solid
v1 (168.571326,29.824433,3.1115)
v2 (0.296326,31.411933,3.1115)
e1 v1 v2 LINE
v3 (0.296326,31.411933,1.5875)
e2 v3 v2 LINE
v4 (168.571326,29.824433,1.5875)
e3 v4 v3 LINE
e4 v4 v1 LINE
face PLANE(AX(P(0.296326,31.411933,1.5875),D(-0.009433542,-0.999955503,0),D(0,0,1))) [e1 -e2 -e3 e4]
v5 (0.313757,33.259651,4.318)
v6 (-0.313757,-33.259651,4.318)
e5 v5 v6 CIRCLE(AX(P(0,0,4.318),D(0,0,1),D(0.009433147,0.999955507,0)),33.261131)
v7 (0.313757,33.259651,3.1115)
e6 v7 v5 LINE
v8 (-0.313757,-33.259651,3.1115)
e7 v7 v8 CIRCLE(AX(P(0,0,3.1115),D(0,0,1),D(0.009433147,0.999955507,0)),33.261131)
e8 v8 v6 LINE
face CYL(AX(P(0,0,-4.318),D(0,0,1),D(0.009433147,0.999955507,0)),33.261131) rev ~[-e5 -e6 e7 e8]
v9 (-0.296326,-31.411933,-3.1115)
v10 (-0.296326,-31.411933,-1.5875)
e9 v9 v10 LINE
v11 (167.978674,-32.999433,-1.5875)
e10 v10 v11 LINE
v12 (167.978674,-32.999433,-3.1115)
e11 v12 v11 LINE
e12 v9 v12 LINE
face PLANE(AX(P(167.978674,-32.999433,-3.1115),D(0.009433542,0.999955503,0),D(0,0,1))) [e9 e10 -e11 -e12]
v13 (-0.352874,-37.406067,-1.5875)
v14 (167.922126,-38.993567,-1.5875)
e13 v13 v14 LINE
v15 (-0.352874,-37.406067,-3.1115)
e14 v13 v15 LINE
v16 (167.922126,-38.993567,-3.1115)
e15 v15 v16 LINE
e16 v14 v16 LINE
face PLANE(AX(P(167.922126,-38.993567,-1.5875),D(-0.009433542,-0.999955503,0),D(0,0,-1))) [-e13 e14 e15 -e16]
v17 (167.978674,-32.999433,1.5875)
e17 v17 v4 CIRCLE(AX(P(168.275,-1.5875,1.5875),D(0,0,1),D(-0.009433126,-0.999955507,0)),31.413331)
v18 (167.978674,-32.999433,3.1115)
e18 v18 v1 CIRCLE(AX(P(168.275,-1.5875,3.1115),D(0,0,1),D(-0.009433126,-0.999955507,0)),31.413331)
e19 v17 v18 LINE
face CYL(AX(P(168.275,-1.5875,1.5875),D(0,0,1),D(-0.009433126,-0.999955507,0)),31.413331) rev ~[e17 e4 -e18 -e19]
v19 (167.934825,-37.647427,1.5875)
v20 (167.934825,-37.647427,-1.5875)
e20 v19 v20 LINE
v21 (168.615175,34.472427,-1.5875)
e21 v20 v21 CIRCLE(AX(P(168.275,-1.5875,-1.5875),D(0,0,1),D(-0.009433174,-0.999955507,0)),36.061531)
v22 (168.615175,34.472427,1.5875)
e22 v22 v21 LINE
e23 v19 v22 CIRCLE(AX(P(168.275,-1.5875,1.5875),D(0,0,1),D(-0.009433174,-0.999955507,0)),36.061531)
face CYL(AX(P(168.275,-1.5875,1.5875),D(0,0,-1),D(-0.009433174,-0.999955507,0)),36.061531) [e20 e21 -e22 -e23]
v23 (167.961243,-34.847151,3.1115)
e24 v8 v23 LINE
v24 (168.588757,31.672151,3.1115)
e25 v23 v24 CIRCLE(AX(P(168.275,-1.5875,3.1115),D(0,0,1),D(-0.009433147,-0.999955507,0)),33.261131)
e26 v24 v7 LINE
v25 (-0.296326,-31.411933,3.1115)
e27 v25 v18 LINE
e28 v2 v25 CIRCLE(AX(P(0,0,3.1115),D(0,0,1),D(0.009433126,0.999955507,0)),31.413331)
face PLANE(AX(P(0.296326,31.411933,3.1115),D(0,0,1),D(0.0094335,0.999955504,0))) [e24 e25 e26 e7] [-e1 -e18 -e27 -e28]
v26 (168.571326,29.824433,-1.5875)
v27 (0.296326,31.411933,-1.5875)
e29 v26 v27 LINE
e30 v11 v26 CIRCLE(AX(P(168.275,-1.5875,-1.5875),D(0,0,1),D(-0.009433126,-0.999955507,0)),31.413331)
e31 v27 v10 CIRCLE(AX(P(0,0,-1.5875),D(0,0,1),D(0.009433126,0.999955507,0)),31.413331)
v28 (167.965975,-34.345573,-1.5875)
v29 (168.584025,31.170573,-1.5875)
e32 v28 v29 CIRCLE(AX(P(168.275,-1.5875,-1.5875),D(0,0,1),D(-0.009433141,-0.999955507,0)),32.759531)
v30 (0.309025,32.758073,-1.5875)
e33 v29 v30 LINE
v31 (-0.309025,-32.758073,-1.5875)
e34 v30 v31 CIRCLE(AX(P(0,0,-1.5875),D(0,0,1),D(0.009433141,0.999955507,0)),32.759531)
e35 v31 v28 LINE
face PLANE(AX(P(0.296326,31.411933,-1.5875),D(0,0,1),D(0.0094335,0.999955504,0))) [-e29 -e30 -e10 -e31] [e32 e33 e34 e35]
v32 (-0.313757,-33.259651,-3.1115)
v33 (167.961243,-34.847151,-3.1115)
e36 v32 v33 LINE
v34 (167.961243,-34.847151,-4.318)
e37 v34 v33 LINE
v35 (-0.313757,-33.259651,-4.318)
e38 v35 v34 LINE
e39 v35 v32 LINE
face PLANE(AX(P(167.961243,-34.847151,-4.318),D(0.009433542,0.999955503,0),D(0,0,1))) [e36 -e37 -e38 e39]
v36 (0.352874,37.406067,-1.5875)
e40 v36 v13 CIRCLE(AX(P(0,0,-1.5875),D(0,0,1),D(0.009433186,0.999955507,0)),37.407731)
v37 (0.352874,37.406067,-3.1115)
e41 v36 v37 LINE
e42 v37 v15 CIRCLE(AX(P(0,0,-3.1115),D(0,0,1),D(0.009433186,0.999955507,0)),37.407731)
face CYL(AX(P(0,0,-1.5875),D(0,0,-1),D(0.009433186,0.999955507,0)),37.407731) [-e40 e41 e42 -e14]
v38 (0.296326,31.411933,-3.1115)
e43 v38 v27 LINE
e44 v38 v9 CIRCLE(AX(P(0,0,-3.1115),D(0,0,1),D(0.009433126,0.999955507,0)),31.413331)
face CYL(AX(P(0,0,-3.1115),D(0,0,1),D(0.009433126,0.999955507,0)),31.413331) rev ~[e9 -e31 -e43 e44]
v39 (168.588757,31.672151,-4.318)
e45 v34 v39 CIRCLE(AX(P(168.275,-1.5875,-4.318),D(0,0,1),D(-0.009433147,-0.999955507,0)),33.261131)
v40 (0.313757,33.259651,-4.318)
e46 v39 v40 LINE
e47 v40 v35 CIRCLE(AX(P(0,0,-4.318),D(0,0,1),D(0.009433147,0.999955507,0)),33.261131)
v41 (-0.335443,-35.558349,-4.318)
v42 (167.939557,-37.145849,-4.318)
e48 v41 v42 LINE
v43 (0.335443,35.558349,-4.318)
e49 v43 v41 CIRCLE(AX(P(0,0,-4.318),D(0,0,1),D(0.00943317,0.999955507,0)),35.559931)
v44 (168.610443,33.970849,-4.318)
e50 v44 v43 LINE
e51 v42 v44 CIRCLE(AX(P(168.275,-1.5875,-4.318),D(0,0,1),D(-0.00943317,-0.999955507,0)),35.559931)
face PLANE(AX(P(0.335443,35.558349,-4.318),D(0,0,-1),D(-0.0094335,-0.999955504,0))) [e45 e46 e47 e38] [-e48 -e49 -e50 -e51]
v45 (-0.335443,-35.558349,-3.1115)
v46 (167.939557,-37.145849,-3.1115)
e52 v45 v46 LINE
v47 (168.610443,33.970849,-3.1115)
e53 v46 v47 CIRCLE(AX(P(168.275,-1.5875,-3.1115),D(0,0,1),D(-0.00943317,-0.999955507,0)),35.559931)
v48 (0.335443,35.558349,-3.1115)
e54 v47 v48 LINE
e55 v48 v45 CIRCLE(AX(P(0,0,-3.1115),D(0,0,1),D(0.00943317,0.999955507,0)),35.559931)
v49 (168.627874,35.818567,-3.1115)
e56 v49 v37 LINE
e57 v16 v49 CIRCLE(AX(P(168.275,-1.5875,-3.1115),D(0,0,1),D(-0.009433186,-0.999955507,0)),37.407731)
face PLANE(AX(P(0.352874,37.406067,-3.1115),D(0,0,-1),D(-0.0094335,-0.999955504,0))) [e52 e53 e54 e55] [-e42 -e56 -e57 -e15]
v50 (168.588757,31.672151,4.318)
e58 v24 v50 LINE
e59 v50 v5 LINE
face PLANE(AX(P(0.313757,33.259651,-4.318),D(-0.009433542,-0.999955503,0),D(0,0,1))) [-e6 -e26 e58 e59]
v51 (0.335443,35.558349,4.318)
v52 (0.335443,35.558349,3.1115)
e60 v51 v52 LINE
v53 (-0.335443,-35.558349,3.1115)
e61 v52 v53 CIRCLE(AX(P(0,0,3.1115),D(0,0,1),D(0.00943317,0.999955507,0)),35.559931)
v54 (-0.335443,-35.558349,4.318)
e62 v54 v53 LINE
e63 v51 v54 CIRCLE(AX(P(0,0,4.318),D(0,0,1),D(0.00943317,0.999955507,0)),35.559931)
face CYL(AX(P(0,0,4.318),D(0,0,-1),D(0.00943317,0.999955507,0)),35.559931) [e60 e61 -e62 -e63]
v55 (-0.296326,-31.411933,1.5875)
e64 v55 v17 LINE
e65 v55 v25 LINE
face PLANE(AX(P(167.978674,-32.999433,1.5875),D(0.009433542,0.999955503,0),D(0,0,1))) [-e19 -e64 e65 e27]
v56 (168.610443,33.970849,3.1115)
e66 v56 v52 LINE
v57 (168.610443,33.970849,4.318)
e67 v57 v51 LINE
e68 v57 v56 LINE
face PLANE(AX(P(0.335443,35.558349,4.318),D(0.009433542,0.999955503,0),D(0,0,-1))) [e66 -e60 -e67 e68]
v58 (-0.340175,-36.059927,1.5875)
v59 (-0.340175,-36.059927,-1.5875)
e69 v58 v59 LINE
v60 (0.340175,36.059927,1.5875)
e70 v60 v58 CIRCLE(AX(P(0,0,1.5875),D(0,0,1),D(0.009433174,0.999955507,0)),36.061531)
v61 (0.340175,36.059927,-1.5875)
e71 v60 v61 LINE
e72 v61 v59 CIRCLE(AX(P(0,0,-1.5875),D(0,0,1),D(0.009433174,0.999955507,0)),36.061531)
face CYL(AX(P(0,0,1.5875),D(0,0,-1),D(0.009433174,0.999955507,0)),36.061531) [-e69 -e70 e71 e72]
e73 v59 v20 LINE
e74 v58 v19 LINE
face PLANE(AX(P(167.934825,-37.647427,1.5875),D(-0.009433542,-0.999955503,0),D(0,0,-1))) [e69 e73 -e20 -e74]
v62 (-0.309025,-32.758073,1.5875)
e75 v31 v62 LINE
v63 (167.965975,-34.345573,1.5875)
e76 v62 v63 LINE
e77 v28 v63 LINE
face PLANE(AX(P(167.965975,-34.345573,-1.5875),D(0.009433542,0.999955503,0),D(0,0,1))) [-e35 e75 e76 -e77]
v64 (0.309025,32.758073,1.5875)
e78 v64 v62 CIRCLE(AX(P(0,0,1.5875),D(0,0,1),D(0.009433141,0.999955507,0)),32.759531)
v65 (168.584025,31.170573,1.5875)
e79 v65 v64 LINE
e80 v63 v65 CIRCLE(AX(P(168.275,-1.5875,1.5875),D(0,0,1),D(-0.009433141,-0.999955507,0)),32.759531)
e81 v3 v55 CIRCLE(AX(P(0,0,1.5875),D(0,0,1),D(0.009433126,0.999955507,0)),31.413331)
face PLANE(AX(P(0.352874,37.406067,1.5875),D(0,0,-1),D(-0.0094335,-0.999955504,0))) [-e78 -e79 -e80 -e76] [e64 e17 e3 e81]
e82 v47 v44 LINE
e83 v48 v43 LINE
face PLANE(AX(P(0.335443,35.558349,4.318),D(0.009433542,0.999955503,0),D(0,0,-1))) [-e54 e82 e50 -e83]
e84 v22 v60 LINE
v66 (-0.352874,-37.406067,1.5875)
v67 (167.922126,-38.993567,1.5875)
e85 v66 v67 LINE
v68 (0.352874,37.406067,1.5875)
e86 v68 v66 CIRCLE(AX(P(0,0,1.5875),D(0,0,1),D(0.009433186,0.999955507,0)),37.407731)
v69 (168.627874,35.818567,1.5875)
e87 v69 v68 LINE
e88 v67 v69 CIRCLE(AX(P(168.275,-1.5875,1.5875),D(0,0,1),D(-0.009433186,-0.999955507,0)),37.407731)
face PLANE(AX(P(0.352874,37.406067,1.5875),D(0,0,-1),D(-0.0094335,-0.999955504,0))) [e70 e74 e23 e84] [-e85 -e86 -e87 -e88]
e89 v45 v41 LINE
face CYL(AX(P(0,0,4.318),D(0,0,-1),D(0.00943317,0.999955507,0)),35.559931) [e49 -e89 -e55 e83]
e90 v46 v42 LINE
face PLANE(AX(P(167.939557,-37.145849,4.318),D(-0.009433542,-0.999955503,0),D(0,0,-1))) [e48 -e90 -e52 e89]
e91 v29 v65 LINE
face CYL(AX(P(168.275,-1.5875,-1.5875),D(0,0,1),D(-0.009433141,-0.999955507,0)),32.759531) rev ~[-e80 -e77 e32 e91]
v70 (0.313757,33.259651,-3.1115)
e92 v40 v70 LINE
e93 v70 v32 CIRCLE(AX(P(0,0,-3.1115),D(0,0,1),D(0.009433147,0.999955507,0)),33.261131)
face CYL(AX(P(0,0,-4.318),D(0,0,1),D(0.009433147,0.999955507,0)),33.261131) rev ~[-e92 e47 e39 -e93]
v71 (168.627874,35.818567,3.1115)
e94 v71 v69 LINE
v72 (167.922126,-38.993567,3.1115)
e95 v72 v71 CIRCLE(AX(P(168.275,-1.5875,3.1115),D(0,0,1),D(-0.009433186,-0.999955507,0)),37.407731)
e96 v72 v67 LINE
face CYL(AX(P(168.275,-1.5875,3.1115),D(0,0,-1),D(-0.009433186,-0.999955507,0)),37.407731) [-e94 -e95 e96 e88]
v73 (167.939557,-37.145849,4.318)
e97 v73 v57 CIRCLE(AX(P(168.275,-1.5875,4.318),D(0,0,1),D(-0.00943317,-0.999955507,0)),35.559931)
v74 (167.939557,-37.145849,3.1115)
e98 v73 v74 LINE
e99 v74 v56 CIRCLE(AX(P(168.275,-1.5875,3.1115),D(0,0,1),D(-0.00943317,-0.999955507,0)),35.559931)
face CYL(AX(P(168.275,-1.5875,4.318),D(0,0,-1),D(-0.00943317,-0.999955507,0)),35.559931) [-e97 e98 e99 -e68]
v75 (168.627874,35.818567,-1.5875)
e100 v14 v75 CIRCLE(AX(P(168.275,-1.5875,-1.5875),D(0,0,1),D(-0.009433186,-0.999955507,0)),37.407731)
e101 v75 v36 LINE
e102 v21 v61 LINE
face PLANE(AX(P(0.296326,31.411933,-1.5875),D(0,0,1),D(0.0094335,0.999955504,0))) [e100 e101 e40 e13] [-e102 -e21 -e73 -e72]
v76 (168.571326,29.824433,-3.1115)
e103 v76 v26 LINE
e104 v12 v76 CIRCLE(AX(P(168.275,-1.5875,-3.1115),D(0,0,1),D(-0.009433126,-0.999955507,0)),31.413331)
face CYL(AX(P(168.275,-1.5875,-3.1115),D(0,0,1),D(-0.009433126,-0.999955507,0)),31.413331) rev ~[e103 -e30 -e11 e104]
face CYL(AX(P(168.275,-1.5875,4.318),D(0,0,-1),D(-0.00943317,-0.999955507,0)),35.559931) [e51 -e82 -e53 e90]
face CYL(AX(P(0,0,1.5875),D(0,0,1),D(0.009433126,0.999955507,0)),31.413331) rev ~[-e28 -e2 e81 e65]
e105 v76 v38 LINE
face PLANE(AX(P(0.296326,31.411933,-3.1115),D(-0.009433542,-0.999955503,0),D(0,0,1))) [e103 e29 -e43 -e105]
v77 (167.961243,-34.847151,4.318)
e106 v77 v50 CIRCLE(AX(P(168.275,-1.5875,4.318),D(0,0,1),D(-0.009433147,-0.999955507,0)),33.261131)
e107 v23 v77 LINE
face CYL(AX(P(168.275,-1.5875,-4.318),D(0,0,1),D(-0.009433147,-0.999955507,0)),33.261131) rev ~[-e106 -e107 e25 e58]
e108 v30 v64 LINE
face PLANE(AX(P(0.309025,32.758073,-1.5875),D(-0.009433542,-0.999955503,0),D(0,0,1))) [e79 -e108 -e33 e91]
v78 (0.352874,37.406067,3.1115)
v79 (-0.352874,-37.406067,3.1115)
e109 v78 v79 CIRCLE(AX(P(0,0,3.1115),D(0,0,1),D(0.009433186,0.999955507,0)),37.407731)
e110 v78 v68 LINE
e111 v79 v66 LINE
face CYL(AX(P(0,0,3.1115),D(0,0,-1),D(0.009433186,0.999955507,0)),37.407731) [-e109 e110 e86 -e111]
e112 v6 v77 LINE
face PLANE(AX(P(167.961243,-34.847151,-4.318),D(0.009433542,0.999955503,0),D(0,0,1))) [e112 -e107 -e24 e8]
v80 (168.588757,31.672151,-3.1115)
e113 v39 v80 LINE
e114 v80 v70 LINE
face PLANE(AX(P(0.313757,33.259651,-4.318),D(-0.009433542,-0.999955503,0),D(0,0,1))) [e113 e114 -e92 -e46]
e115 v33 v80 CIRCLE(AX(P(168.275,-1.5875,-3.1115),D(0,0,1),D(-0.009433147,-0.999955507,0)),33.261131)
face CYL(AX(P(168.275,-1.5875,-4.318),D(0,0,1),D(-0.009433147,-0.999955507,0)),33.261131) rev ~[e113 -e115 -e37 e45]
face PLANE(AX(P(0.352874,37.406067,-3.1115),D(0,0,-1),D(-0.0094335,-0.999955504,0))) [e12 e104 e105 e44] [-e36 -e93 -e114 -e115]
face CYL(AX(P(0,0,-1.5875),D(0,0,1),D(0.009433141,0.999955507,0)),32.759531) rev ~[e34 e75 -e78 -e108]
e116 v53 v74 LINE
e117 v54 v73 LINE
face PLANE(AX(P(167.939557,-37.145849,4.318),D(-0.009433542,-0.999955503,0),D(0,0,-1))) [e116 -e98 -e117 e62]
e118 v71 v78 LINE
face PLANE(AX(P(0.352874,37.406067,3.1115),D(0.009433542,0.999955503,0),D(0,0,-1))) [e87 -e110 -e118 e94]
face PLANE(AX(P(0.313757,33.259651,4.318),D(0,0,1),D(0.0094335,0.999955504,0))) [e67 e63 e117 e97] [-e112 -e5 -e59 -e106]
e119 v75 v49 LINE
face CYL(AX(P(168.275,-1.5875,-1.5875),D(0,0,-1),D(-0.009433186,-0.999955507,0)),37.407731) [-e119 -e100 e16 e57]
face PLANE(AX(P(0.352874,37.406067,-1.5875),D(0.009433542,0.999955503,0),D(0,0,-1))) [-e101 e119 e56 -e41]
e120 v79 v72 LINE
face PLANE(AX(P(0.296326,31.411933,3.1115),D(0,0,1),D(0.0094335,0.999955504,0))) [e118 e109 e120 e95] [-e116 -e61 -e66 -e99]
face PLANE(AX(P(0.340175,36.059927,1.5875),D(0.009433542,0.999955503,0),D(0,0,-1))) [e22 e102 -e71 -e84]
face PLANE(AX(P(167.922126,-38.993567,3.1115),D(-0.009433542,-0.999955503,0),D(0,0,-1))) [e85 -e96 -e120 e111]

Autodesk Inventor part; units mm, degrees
ref_plane "Work Plane2" through (0, 0, 0) normal (-1, 0, 0) x (0, 0, 1)
ref_plane "Work Plane3" through (168.275, -1.5875, 0) normal (-0.9957606, 0.0919832, 0) x (0, 0, 1)
sketch "Path" plane through (0, 0, 0) normal (0, 0, 1) x (1, 0, 0)
  arc A0 (0.3246, 34.409) -> (-0.3246, -34.409) centre (0, 0) ccw
  arc A1 (167.9504, -35.9965) -> (168.5996, 32.8215) centre (168.275, -1.5875) ccw
  line L0 (167.9504, -35.9965) -> (-0.3246, -34.409)
  line L1 (0.3246, 34.409) -> (168.5996, 32.8215)
  dimension "d31" = 5.9944
ref_plane "Section Plane" through (-0.3246, -34.409, 0) normal (0.9999555, -0.0094335, 0) x (0, 0, 1)
sketch "Section Sketch" plane through (-0.3246, -34.409, 0) normal (0.9999555, -0.0094335, 0) x (0, 0, 1)
  line L0 (-4.318, -1.1494) -> (4.318, -1.1494)
  line L1 (4.318, -1.1494) -> (4.318, 1.1494)
  line L2 (4.318, 1.1494) -> (-4.318, 1.1494)
  line L3 (-4.318, 1.1494) -> (-4.318, -1.1494)
  line L4 (-1.5875, -1.651) -> (1.5875, -1.651)
  line L5 (1.5875, -1.651) -> (1.5875, 1.651)
  line L6 (1.5875, 1.651) -> (-1.5875, 1.651)
  line L7 (-1.5875, 1.651) -> (-1.5875, -1.651)
  line L8 (-1.5875, 0) -> (1.5875, 0) construction
  line L9 (-3.1115, -2.9972) -> (-1.5875, -2.9972)
  line L10 (-1.5875, -2.9972) -> (-1.5875, 2.9972)
  line L11 (-1.5875, 2.9972) -> (-3.1115, 2.9972)
  line L12 (-3.1115, 2.9972) -> (-3.1115, -2.9972)
  line L13 (1.5875, -2.9972) -> (3.1115, -2.9972)
  line L14 (3.1115, -2.9972) -> (3.1115, 2.9972)
  line L15 (3.1115, 2.9972) -> (1.5875, 2.9972)
  line L16 (1.5875, 2.9972) -> (1.5875, -2.9972)
  line L17 (-4.318, 0) -> (4.318, 0) construction
  point P0 (0, 0)
  point P1 (0, 0)
  dimension "d21" = 2.2987
  dimension "d22" = 3.302
  dimension "d23" = 3.175
  dimension "d24" = 1.524
  dimension "d31" = 5.9944
  dimension "d32" = 8.636
sweep "Solid" add profiles "Section Sketch" path "Path"
pattern_of_one "Strand Pattern"
equation "\"d21\" = da_d2"
equation "\"d22\" = da_d1"
equation "\"d23\" = da_b1"
equation "\"d24\" = da_t1 + da_t2"
equation "\"d30\" = da_pt"
equation "\"da_p\" = 6.35"
equation "\"da_b1\" = 3.175"
equation "\"da_h2\" = 5.9944"
equation "\"da_h3\" = 5.207"
equation "\"da_d1\" = 3.302"
equation "\"da_d2\" = 2.2987"
equation "\"da_pt\" = 6.4008"
equation "\"da_b\" = 8.636"
equation "\"da_t1\" = 0.762"
equation "\"da_t2\" = 0.762"
properties part number "Roller Chain" material "Stainless Steel, 440C"
